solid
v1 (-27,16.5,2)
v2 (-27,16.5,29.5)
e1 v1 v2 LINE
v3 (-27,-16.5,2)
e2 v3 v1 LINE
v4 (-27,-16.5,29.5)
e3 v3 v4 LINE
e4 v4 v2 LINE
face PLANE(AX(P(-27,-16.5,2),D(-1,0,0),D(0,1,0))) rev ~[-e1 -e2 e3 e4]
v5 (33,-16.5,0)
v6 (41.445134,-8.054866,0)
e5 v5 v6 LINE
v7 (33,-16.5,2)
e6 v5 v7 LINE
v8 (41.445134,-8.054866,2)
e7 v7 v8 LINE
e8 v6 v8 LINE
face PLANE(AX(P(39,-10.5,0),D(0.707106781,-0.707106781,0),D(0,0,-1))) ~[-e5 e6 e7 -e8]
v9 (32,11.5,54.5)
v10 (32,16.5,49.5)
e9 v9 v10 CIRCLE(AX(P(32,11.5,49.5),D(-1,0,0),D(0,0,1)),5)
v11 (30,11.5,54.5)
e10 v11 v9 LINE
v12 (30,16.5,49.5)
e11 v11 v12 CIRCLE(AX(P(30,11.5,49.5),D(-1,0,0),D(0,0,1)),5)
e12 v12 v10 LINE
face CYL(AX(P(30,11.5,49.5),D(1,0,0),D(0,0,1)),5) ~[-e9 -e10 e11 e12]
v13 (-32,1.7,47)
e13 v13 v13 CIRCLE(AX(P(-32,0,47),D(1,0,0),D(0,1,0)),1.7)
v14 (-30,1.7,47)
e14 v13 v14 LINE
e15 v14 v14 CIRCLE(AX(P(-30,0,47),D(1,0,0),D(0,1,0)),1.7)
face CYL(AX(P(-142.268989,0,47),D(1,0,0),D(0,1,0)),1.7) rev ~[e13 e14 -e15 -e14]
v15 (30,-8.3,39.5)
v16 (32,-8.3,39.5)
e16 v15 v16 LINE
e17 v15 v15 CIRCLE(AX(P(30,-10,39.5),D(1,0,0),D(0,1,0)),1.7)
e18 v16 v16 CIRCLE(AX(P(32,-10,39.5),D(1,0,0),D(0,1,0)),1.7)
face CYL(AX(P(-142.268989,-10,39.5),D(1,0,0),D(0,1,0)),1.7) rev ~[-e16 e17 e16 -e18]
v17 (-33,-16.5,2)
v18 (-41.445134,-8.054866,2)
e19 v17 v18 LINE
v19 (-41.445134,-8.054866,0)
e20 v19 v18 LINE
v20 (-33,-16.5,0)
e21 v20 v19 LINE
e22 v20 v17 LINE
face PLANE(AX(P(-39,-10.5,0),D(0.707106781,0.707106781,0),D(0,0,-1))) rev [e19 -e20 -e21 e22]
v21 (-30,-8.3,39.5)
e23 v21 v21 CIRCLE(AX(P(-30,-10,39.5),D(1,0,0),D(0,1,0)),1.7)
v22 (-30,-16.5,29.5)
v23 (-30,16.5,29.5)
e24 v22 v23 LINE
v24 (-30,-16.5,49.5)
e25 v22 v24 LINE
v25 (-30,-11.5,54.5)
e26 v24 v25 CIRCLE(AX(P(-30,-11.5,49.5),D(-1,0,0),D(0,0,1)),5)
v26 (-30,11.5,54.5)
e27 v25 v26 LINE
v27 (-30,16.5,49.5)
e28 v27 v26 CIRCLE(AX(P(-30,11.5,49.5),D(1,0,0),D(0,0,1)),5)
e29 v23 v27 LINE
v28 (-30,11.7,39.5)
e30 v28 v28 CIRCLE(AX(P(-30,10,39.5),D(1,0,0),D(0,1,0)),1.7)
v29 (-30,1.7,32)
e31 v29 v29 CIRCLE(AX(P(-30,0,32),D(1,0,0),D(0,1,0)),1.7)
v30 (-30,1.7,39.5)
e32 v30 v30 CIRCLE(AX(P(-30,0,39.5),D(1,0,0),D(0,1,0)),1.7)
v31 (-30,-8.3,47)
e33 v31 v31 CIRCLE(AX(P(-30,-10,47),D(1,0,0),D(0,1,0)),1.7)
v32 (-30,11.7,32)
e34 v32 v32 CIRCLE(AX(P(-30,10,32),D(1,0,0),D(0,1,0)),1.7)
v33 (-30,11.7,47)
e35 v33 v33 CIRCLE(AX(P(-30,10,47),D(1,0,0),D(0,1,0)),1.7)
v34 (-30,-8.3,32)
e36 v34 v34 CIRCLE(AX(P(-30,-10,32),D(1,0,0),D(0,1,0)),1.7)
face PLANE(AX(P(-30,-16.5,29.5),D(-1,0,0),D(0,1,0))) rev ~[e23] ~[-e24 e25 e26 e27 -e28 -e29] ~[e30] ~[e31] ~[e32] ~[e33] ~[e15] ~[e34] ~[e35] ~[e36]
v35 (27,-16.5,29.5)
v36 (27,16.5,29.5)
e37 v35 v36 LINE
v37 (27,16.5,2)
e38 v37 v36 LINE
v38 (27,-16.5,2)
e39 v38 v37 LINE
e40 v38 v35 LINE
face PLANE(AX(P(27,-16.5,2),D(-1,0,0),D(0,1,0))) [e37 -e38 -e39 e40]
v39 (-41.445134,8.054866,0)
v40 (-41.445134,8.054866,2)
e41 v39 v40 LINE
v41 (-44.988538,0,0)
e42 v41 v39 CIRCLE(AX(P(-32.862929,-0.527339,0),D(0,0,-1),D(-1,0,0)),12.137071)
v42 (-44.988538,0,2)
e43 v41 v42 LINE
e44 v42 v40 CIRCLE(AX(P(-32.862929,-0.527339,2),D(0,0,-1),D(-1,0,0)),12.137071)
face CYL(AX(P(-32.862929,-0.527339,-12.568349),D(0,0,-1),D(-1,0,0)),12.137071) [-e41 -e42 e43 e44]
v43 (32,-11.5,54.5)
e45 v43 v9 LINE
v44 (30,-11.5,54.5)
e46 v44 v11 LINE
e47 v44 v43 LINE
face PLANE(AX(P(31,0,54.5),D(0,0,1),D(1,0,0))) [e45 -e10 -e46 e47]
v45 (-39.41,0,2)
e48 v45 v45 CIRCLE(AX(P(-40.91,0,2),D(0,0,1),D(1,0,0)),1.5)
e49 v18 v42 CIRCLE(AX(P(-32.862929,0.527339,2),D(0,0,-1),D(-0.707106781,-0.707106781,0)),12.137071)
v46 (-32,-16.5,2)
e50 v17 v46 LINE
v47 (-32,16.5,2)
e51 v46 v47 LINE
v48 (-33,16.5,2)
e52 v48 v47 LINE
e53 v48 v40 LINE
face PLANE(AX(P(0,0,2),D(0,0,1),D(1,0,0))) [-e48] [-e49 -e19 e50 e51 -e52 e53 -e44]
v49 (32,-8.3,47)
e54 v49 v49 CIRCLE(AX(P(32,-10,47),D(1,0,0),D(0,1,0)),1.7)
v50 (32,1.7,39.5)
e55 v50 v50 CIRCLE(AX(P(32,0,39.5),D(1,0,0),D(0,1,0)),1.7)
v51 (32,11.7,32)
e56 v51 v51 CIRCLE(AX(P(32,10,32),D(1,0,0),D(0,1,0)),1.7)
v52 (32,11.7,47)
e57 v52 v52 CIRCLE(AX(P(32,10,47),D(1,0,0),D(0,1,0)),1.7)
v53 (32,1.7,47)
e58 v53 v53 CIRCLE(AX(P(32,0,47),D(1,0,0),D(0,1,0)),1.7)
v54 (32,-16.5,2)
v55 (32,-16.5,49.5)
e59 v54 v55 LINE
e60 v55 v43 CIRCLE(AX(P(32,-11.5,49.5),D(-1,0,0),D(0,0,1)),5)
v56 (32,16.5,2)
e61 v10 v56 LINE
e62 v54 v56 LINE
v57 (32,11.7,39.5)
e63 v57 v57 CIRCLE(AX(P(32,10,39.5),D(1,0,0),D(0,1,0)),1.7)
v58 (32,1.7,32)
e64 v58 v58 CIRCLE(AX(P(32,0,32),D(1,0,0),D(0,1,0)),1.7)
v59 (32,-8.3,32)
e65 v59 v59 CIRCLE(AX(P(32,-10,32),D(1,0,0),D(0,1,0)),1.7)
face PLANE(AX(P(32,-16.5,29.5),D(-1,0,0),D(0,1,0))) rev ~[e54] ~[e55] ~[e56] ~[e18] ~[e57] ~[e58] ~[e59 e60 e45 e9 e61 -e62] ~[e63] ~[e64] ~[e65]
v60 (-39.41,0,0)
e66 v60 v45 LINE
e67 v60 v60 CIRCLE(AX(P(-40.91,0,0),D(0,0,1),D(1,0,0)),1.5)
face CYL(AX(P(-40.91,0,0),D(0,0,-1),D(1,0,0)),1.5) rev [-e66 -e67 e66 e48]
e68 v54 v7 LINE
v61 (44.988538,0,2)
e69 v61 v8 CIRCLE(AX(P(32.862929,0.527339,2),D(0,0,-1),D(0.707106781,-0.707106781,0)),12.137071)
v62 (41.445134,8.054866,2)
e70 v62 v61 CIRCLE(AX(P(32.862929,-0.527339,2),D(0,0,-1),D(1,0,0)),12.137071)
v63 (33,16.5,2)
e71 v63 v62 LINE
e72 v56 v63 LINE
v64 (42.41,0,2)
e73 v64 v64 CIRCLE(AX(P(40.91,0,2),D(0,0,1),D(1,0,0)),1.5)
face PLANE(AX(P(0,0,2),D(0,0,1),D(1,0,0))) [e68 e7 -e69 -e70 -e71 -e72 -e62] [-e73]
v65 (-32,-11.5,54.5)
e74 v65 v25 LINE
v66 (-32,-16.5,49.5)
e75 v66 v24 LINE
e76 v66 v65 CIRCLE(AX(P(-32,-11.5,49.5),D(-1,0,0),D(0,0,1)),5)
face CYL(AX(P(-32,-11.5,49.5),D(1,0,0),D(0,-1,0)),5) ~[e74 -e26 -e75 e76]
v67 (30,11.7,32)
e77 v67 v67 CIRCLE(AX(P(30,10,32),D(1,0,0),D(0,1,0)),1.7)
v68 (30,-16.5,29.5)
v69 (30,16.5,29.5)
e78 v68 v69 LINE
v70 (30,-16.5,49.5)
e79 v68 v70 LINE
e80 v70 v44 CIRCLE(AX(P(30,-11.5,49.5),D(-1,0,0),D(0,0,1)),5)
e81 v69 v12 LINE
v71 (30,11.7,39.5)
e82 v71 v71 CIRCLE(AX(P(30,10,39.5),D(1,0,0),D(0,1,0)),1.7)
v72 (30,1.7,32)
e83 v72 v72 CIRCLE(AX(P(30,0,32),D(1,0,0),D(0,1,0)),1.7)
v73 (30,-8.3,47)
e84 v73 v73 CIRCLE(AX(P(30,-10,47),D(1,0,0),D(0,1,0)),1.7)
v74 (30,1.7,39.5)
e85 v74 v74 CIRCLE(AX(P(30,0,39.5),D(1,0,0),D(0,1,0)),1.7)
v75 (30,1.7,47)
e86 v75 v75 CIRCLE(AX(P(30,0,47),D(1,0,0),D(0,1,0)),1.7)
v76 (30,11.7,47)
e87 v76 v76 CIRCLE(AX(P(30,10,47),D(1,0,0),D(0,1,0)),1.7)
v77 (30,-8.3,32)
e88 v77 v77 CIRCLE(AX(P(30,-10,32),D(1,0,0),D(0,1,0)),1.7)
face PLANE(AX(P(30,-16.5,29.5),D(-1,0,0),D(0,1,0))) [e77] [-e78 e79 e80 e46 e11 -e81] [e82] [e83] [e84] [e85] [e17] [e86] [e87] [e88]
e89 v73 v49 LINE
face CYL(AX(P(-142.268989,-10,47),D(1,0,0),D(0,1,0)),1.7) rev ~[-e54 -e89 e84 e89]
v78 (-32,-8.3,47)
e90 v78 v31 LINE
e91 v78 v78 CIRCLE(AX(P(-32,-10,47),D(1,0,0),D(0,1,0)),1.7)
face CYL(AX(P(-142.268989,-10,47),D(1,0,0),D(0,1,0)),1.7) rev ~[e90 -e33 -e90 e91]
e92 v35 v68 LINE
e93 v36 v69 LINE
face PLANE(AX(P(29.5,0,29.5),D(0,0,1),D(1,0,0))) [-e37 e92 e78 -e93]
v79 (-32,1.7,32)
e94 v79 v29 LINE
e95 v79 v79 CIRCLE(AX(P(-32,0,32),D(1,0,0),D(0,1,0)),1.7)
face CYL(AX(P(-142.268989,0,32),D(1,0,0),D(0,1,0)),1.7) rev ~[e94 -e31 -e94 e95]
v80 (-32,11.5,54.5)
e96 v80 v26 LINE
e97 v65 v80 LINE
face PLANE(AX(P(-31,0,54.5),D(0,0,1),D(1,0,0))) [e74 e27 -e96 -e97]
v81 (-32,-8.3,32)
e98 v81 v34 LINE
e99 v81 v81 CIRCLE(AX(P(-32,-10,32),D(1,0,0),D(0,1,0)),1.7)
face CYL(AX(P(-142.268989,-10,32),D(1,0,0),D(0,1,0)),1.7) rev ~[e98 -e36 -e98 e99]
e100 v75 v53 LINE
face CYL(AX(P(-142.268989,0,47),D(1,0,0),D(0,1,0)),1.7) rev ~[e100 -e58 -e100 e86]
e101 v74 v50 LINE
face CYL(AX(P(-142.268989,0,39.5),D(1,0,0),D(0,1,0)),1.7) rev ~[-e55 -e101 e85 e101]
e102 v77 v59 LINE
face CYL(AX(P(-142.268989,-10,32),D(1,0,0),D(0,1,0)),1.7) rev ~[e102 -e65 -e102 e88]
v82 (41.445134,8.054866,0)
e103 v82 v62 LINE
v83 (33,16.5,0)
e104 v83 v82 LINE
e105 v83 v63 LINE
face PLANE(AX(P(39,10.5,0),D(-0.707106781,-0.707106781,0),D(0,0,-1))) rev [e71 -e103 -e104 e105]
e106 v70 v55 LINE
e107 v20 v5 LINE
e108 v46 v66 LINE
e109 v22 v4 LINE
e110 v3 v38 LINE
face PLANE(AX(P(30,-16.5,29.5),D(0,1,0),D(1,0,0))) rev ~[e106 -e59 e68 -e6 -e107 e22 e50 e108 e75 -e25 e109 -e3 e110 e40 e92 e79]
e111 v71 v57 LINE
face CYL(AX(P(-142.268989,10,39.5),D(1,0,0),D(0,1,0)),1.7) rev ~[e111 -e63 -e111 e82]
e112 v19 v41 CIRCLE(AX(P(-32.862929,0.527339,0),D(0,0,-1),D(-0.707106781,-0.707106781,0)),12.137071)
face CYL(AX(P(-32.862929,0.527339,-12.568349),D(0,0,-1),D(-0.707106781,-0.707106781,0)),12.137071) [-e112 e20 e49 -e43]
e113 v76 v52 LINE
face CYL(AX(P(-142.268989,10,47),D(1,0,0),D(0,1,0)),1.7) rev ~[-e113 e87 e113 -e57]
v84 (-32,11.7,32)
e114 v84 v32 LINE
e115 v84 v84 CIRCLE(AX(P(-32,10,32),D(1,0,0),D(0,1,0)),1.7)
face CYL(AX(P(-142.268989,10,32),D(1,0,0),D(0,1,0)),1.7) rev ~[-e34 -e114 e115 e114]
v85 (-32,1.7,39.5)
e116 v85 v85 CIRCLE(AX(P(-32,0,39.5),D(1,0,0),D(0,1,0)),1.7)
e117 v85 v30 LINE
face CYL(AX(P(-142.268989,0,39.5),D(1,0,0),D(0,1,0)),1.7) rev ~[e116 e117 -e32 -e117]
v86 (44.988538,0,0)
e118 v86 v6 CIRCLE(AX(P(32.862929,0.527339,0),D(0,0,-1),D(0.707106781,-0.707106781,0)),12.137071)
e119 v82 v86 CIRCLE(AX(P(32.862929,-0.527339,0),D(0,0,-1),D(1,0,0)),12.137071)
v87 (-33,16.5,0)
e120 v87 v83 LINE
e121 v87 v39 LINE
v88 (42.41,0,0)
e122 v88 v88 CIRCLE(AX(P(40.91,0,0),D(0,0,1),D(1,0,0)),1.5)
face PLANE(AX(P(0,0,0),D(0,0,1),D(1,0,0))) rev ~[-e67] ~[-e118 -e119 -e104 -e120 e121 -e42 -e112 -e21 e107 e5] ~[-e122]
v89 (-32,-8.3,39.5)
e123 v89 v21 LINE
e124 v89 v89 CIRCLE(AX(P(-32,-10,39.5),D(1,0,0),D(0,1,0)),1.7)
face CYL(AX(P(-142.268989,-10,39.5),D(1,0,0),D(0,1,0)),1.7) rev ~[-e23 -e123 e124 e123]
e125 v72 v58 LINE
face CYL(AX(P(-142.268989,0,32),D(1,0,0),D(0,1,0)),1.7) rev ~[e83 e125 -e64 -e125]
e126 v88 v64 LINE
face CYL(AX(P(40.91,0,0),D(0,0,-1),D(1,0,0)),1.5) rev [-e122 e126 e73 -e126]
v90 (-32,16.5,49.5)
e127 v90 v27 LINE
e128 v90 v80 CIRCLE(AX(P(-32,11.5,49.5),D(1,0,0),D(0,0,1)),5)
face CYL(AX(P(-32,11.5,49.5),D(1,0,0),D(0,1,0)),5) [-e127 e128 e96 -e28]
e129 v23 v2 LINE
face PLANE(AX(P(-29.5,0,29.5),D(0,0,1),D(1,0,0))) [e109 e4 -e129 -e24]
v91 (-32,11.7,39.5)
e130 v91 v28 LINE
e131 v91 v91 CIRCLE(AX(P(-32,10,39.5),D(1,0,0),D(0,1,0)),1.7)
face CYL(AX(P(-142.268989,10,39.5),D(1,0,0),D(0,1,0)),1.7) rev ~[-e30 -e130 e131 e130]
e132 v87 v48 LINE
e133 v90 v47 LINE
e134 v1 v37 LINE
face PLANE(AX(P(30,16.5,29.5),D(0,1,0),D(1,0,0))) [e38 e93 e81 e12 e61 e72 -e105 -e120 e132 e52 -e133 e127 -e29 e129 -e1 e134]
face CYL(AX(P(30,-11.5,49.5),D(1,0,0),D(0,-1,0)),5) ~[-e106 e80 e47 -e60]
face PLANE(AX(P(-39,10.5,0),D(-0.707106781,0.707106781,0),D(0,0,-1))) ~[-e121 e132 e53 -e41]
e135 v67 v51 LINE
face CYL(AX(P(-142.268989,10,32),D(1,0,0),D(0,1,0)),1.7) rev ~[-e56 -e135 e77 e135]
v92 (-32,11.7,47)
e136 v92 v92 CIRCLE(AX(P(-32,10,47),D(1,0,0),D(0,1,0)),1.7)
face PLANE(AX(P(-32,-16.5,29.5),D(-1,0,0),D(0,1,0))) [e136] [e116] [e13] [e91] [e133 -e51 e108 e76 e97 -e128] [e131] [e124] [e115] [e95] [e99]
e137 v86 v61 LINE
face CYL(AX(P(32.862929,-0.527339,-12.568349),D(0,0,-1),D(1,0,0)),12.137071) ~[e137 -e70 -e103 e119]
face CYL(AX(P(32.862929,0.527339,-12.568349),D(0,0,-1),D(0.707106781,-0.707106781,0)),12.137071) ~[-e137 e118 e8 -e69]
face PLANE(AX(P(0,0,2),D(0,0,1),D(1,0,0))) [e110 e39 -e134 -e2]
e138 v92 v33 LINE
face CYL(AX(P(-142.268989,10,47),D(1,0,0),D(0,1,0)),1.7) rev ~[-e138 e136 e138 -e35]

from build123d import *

# Parameters (mm, degrees)
F0_W         = 90
F0_H         = 33
F0_R         = 1.5
F1_DEPTH     = 2
F2_W         = 5
F2_H         = 33
F3_DEPTH     = 27.5
F4_W         = 2
F4_H         = 33
F5_DEPTH     = 25
F6_W         = 2
F6_H         = 33
F7_DEPTH     = 25
F9_D         = 3.4
F10_R        = 5
F11_SIZE     = 12
F12_T1_DEPTH = 27.1366974606


# Not quite as in the source:
# - a fillet or chamfer that OpenCascade refuses, or shapes differently, is made with other operations: its cross-section is extruded or revolved along the edge and cut away or added


with BuildPart() as f1:
    # F0 (on Top) → F1 (new body)
    with BuildSketch(Plane.XY):
        Rectangle(F0_W, F0_H)
        with Locations((-40.91, 0)):
            Circle(F0_R, mode=Mode.SUBTRACT)
        with Locations((40.91, 0)):
            Circle(F0_R, mode=Mode.SUBTRACT)
    extrude(amount=F1_DEPTH)

    # F2 (on face) → F3 (join)
    with BuildSketch(Plane.XY.offset(2)):
        with Locations((-29.5, 0)):
            Rectangle(F2_W, F2_H)
        with Locations((29.5, 0)):
            Rectangle(F2_W, F2_H)
    extrude(amount=F3_DEPTH)

    # F4 (on face) → F5 (join)
    with BuildSketch(Plane.XY.offset(29.5)):
        with Locations((-31, 0)):
            Rectangle(F4_W, F4_H)
    extrude(amount=F5_DEPTH)

    # F6 (on face) → F7 (join)
    with BuildSketch(Plane.XY.offset(29.5)):
        with Locations((31, 0)):
            Rectangle(F6_W, F6_H)
    extrude(amount=F7_DEPTH)

    # F9 (through all)
    with Locations(Plane(origin=(-32, 0, 0), x_dir=(0, -1, 0), z_dir=(-1, 0, 0))):
        with Locations((-10, 47), (-10, 39.5), (0, 39.5), (0, 47), (10, 47), (10, 39.5), (-10, 32), (0, 32), (10, 32)):
            Hole(F9_D / 2)

    # F10
    f10_edges = [f1.edges().sort_by_distance(p)[0] for p in [
        (-31, 16.5, 54.5),
        (31, 16.5, 54.5),
        (-31, -16.5, 54.5),
        (31, -16.5, 54.5),
    ]]
    fillet(f10_edges, radius=F10_R)

    # F11
    f11_edges = [f1.edges().sort_by_distance(p)[0] for p in [
        (45, 16.5, 1),
        (45, -16.5, 1),
        (-45, -16.5, 1),
        (-45, 16.5, 1),
    ]]
    chamfer(f11_edges, length=F11_SIZE)

    # F12: fillet of radius 12.1370711845 on 4 edges, made by hand

    # F12_s2 → F12_t1 (cut)
    with BuildSketch(Plane.XY.offset(-12.5683487303)):
        with BuildLine():
            ThreePointArc((41.4451341538, -8.0548658462), (44.0761204675, -4.1173165676), (45, 0.5273394921))
            Line((45, 0.5273394921), (45, -4.5))
            Line((45, -4.5), (41.4451341538, -8.0548658462))
        make_face()
        with BuildLine():
            ThreePointArc((45, -0.5273394921), (44.0761204675, 4.1173165676), (41.4451341538, 8.0548658462))
            Line((41.4451341538, 8.0548658462), (45, 4.5))
            Line((45, 4.5), (45, -0.5273394921))
        make_face()
        with BuildLine():
            ThreePointArc((-41.4451341538, -8.0548658462), (-44.0761204675, -4.1173165676), (-45, 0.5273394921))
            Line((-45, 0.5273394921), (-45, -4.5))
            Line((-45, -4.5), (-41.4451341538, -8.0548658462))
        make_face()
        with BuildLine():
            ThreePointArc((-45, -0.5273394921), (-44.0761204675, 4.1173165676), (-41.4451341538, 8.0548658462))
            Line((-41.4451341538, 8.0548658462), (-45, 4.5))
            Line((-45, 4.5), (-45, -0.5273394921))
        make_face()
    extrude(amount=F12_T1_DEPTH, mode=Mode.SUBTRACT)


solid = f1.part
